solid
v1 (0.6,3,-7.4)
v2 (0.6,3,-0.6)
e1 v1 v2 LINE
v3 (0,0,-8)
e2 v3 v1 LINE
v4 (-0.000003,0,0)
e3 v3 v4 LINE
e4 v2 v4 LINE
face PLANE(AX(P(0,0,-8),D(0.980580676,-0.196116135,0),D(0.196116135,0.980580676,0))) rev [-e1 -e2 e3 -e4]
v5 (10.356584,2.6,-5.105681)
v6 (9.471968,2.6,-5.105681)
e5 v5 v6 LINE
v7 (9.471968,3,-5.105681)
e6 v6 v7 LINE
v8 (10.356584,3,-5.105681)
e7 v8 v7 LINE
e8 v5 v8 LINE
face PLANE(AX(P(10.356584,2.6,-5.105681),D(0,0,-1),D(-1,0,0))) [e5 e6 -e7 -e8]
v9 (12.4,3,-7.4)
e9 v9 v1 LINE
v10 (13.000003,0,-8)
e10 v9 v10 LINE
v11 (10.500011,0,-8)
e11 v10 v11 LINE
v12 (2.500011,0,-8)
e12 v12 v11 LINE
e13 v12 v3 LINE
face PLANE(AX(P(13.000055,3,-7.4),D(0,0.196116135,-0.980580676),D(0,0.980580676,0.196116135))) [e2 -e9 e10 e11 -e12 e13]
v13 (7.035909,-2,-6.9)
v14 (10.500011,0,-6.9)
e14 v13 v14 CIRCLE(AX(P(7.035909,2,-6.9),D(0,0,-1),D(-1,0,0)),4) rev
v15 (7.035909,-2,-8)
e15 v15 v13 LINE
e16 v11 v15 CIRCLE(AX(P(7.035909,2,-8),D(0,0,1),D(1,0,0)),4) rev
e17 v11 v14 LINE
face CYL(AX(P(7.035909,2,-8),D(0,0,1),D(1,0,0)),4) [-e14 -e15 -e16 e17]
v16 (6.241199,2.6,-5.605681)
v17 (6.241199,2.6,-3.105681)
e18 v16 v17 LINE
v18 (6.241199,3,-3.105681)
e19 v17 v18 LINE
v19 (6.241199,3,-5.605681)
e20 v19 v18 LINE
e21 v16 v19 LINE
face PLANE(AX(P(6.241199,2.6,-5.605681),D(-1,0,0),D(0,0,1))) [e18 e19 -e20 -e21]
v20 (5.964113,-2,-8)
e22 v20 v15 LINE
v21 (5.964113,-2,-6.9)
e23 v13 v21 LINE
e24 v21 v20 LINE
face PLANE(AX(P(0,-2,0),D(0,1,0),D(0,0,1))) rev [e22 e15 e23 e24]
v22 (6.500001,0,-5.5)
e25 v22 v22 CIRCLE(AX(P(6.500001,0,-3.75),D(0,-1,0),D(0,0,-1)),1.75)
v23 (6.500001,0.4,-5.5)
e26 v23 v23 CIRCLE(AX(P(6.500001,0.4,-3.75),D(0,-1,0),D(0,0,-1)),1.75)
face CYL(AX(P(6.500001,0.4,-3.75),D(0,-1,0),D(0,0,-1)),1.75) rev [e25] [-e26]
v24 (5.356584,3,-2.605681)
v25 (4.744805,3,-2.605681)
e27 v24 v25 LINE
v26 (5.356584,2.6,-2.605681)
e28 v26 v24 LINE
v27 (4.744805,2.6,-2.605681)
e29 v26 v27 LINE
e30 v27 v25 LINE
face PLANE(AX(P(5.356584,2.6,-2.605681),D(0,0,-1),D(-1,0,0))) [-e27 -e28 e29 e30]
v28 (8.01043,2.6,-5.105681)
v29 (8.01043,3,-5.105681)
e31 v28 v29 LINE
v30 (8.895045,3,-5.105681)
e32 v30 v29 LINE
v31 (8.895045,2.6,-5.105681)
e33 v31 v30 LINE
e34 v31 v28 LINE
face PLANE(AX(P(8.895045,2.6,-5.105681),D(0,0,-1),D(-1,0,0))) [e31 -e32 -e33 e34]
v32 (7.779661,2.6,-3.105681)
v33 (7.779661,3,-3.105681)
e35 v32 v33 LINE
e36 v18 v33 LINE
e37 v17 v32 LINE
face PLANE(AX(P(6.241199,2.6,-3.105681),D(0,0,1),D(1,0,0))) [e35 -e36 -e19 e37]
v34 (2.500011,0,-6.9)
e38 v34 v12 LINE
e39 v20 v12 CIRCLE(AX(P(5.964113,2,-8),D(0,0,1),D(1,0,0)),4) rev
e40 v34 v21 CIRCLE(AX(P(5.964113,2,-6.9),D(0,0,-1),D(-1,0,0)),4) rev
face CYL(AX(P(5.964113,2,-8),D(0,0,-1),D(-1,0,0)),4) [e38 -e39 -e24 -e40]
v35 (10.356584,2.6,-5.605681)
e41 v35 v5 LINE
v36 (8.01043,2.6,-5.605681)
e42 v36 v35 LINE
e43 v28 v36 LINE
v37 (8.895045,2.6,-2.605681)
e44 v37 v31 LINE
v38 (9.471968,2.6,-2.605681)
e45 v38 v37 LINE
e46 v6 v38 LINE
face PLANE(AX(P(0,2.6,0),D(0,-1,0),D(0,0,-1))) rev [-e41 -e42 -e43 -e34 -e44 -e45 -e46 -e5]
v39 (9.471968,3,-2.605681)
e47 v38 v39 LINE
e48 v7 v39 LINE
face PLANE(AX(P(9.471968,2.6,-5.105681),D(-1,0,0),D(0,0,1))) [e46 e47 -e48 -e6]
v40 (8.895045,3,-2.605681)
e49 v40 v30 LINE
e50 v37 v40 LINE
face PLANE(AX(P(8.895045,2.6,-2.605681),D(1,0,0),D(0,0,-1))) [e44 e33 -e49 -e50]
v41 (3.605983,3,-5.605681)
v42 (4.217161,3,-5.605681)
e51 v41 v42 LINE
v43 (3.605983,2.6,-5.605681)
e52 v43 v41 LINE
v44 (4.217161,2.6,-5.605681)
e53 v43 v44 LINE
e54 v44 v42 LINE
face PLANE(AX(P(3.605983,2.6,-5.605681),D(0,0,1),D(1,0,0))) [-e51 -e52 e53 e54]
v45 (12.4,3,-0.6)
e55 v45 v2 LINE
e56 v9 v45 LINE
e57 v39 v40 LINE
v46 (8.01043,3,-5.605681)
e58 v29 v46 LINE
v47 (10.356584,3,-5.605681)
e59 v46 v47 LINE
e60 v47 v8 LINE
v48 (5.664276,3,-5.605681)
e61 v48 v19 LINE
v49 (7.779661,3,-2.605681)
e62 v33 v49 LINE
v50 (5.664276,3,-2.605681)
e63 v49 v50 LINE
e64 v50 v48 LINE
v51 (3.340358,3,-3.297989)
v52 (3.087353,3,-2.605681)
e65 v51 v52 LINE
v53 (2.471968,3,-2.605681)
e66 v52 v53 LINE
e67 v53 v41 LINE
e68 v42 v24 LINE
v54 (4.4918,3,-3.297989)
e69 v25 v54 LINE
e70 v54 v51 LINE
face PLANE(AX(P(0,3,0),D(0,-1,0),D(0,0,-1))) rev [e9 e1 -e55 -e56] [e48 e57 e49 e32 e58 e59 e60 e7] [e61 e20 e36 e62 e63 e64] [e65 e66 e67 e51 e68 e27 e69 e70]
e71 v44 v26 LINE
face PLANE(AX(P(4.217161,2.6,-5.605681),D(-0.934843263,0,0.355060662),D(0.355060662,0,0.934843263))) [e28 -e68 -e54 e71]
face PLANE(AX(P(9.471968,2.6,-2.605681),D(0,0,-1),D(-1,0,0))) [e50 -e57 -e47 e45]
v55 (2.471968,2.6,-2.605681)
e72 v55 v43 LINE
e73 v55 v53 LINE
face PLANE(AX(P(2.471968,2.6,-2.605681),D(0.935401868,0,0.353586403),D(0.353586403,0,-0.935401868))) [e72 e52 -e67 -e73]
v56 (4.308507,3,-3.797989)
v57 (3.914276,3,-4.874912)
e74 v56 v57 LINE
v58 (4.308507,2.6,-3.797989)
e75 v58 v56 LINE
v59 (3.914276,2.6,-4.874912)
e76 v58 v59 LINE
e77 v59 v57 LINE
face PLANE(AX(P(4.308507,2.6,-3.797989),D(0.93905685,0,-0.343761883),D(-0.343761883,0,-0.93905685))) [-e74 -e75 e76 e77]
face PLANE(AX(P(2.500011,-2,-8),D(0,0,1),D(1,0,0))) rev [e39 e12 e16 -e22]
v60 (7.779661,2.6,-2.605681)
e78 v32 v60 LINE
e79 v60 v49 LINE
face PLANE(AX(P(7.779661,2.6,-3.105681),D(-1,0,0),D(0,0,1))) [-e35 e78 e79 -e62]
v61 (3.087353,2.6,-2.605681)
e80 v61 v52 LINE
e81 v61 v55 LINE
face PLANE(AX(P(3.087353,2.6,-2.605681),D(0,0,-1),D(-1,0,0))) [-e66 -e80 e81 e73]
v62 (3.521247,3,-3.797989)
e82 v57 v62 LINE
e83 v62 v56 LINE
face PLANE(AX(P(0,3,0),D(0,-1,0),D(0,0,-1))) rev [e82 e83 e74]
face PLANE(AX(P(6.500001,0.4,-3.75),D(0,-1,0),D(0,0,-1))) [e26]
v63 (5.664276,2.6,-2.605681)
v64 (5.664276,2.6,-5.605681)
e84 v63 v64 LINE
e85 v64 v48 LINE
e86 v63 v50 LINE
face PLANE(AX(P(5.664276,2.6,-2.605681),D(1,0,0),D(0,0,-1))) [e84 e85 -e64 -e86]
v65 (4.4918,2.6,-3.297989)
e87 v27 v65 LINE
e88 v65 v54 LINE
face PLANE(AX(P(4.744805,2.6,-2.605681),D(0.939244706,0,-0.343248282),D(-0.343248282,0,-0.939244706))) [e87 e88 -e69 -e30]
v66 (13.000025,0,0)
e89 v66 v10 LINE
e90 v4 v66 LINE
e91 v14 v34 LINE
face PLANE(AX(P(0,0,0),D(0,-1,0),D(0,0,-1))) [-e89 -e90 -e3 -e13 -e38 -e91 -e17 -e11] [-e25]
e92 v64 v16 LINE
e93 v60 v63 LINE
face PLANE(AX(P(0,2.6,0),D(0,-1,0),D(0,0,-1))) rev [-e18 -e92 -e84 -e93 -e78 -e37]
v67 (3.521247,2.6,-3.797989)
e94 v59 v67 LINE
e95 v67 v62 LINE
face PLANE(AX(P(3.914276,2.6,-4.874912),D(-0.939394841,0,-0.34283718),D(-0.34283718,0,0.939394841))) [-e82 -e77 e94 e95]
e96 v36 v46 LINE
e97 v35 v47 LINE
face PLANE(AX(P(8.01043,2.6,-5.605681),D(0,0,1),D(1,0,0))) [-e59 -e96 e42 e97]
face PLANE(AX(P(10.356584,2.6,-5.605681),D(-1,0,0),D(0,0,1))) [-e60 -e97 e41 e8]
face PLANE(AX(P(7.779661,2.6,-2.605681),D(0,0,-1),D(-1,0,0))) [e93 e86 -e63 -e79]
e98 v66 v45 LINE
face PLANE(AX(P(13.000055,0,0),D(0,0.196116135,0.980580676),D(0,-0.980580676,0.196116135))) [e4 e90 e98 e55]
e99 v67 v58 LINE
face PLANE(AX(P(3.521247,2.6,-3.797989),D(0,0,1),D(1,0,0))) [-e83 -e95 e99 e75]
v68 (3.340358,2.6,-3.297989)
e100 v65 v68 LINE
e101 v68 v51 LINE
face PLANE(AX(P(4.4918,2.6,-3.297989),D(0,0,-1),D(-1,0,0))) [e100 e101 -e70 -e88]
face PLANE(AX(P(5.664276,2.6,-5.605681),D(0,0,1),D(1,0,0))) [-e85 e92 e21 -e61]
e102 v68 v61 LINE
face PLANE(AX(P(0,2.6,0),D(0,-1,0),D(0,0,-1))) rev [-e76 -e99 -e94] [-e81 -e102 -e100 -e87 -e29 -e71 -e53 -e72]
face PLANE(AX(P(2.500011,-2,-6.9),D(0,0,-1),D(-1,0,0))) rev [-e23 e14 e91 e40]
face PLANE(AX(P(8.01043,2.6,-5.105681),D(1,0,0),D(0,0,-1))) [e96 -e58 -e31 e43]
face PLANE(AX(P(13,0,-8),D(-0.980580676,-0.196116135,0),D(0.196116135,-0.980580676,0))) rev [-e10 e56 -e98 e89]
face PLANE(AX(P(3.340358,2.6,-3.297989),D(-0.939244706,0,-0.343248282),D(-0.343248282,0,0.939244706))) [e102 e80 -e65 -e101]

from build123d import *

# Parameters (mm, degrees)
SKETCH1_W               = 13
SKETCH1_H               = 8
BOSS_EXTRUDE1_DEPTH     = 3
CUT_EXTRUDE1_DEPTH      = 16.556349186
CUT_EXTRUDE1_DEPTH_BACK = 16.556349186
CUT_EXTRUDE2_DEPTH      = 16.556349186
CUT_EXTRUDE2_DEPTH_BACK = 16.556349186
SKETCH4_R               = 1.75
CUT_EXTRUDE3_DEPTH      = 0.4
SKETCH5_W               = 8
SKETCH5_H               = 1.1
BOSS_EXTRUDE2_DEPTH     = 2
FILLET1_R               = 4
CUT_EXTRUDE4_DEPTH      = 0.4


with BuildPart() as part:
    # Sketch1 → Boss-Extrude1 (new body)
    with BuildSketch(Plane(origin=(0, 0, 0), x_dir=(1, 0, 0), z_dir=(0, 1, 0))):
        with Locations((6.5, 4)):
            Rectangle(SKETCH1_W, SKETCH1_H)
    extrude(amount=BOSS_EXTRUDE1_DEPTH)

    # Sketch2 → Cut-Extrude1 (cut, two sides: drawn at the far end of the back side and taken through both)
    with BuildSketch(Plane.XY.offset(-CUT_EXTRUDE1_DEPTH_BACK)):
        Polygon((0, 0), (0.6, 3), (0, 3), align=None)
        Polygon((13, 0), (12.4, 3), (13, 3), align=None)
    extrude(amount=CUT_EXTRUDE1_DEPTH + CUT_EXTRUDE1_DEPTH_BACK, mode=Mode.SUBTRACT)

    # Sketch3 → Cut-Extrude2 (cut, two sides: drawn at the far end of the back side and taken through both)
    with BuildSketch(Plane(origin=(0, 0, 0), x_dir=(0, 0, -1), z_dir=(1, 0, 0)).offset(-CUT_EXTRUDE2_DEPTH_BACK)):
        Polygon((0, 0), (0.6, 3), (0, 3), align=None)
        Polygon((8, 3), (7.4, 3), (8, 0), align=None)
    extrude(amount=CUT_EXTRUDE2_DEPTH + CUT_EXTRUDE2_DEPTH_BACK, mode=Mode.SUBTRACT)

    # Sketch4 → Cut-Extrude3 (cut)
    with BuildSketch(Plane.XZ):
        with Locations(Location((6.50000125, -3.75, 0), (0, 0, 270))):
            Circle(SKETCH4_R)
    extrude(amount=-CUT_EXTRUDE3_DEPTH, mode=Mode.SUBTRACT)

    # Sketch5 → Boss-Extrude2 (add)
    with BuildSketch(Plane.XZ):
        with Locations((6.500011, -7.45)):
            Rectangle(SKETCH5_W, SKETCH5_H)
    extrude(amount=BOSS_EXTRUDE2_DEPTH)

    # Fillet1
    # the kernel refuses this fillet: 4 mm, written as the material it takes off along each edge
    with BuildSketch(Plane(origin=(10.500011, -2, -16.660254038), x_dir=(0, 1, 0), z_dir=(0, 0, 1)), Plane(origin=(2.500011, -2, 1.760254038), x_dir=(0, 1, 0), z_dir=(0, 0, -1))) as fillet1_piece_1:
        with BuildLine():
            CenterArc((4, 3.464101615), FILLET1_R, 180, 60)
            Line((0, 3.464101615), (-0.08, 3.464101615))
            Line((-0.08, 3.464101615), (-0.08, 0))
            Line((-0.08, 0), (0, -0.08))
            ThreePointArc((0, -0.08), (1, -0.08), (1.96, -0.069282032))
            Line((1.96, -0.069282032), (2, 0))
        make_face()
    extrude(amount=18.420508076, mode=Mode.SUBTRACT)

    # Sketch6 → Cut-Extrude4 (cut)
    # profile 1 of 3: a face of its own
    with BuildSketch(Plane(origin=(0, 3, 0), x_dir=(1, 0, 0), z_dir=(0, 1, 0))):
        Polygon((5.356583629, 2.605681315), (4.744804782, 2.605681315), (4.491799975, 3.297989008), (3.340357667, 3.297989008), (3.087352859, 2.605681315), (2.471968244, 2.605681315), (3.605982667, 5.605681315), (4.217160552, 5.605681315), align=None)
        Polygon((4.308506705, 3.797989008), (3.914275936, 4.874912084), (3.52124709, 3.797989008), align=None, mode=Mode.SUBTRACT)
    # profile 2 of 3: a face of its own
    with BuildSketch(Plane(origin=(0, 3, 0), x_dir=(1, 0, 0), z_dir=(0, 1, 0))):
        Polygon((5.664275936, 2.605681315), (5.664275936, 5.605681315), (6.241199013, 5.605681315), (6.241199013, 3.105681315), (7.779660552, 3.105681315), (7.779660552, 2.605681315), align=None)
    # profile 3 of 3: a face of its own
    with BuildSketch(Plane(origin=(0, 3, 0), x_dir=(1, 0, 0), z_dir=(0, 1, 0))):
        Polygon((8.895045167, 2.605681315), (8.895045167, 5.105681315), (8.010429782, 5.105681315), (8.010429782, 5.605681315), (10.356583629, 5.605681315), (10.356583629, 5.105681315), (9.471968244, 5.105681315), (9.471968244, 2.605681315), align=None)
    extrude(amount=-CUT_EXTRUDE4_DEPTH, mode=Mode.SUBTRACT)


solid = part.part
